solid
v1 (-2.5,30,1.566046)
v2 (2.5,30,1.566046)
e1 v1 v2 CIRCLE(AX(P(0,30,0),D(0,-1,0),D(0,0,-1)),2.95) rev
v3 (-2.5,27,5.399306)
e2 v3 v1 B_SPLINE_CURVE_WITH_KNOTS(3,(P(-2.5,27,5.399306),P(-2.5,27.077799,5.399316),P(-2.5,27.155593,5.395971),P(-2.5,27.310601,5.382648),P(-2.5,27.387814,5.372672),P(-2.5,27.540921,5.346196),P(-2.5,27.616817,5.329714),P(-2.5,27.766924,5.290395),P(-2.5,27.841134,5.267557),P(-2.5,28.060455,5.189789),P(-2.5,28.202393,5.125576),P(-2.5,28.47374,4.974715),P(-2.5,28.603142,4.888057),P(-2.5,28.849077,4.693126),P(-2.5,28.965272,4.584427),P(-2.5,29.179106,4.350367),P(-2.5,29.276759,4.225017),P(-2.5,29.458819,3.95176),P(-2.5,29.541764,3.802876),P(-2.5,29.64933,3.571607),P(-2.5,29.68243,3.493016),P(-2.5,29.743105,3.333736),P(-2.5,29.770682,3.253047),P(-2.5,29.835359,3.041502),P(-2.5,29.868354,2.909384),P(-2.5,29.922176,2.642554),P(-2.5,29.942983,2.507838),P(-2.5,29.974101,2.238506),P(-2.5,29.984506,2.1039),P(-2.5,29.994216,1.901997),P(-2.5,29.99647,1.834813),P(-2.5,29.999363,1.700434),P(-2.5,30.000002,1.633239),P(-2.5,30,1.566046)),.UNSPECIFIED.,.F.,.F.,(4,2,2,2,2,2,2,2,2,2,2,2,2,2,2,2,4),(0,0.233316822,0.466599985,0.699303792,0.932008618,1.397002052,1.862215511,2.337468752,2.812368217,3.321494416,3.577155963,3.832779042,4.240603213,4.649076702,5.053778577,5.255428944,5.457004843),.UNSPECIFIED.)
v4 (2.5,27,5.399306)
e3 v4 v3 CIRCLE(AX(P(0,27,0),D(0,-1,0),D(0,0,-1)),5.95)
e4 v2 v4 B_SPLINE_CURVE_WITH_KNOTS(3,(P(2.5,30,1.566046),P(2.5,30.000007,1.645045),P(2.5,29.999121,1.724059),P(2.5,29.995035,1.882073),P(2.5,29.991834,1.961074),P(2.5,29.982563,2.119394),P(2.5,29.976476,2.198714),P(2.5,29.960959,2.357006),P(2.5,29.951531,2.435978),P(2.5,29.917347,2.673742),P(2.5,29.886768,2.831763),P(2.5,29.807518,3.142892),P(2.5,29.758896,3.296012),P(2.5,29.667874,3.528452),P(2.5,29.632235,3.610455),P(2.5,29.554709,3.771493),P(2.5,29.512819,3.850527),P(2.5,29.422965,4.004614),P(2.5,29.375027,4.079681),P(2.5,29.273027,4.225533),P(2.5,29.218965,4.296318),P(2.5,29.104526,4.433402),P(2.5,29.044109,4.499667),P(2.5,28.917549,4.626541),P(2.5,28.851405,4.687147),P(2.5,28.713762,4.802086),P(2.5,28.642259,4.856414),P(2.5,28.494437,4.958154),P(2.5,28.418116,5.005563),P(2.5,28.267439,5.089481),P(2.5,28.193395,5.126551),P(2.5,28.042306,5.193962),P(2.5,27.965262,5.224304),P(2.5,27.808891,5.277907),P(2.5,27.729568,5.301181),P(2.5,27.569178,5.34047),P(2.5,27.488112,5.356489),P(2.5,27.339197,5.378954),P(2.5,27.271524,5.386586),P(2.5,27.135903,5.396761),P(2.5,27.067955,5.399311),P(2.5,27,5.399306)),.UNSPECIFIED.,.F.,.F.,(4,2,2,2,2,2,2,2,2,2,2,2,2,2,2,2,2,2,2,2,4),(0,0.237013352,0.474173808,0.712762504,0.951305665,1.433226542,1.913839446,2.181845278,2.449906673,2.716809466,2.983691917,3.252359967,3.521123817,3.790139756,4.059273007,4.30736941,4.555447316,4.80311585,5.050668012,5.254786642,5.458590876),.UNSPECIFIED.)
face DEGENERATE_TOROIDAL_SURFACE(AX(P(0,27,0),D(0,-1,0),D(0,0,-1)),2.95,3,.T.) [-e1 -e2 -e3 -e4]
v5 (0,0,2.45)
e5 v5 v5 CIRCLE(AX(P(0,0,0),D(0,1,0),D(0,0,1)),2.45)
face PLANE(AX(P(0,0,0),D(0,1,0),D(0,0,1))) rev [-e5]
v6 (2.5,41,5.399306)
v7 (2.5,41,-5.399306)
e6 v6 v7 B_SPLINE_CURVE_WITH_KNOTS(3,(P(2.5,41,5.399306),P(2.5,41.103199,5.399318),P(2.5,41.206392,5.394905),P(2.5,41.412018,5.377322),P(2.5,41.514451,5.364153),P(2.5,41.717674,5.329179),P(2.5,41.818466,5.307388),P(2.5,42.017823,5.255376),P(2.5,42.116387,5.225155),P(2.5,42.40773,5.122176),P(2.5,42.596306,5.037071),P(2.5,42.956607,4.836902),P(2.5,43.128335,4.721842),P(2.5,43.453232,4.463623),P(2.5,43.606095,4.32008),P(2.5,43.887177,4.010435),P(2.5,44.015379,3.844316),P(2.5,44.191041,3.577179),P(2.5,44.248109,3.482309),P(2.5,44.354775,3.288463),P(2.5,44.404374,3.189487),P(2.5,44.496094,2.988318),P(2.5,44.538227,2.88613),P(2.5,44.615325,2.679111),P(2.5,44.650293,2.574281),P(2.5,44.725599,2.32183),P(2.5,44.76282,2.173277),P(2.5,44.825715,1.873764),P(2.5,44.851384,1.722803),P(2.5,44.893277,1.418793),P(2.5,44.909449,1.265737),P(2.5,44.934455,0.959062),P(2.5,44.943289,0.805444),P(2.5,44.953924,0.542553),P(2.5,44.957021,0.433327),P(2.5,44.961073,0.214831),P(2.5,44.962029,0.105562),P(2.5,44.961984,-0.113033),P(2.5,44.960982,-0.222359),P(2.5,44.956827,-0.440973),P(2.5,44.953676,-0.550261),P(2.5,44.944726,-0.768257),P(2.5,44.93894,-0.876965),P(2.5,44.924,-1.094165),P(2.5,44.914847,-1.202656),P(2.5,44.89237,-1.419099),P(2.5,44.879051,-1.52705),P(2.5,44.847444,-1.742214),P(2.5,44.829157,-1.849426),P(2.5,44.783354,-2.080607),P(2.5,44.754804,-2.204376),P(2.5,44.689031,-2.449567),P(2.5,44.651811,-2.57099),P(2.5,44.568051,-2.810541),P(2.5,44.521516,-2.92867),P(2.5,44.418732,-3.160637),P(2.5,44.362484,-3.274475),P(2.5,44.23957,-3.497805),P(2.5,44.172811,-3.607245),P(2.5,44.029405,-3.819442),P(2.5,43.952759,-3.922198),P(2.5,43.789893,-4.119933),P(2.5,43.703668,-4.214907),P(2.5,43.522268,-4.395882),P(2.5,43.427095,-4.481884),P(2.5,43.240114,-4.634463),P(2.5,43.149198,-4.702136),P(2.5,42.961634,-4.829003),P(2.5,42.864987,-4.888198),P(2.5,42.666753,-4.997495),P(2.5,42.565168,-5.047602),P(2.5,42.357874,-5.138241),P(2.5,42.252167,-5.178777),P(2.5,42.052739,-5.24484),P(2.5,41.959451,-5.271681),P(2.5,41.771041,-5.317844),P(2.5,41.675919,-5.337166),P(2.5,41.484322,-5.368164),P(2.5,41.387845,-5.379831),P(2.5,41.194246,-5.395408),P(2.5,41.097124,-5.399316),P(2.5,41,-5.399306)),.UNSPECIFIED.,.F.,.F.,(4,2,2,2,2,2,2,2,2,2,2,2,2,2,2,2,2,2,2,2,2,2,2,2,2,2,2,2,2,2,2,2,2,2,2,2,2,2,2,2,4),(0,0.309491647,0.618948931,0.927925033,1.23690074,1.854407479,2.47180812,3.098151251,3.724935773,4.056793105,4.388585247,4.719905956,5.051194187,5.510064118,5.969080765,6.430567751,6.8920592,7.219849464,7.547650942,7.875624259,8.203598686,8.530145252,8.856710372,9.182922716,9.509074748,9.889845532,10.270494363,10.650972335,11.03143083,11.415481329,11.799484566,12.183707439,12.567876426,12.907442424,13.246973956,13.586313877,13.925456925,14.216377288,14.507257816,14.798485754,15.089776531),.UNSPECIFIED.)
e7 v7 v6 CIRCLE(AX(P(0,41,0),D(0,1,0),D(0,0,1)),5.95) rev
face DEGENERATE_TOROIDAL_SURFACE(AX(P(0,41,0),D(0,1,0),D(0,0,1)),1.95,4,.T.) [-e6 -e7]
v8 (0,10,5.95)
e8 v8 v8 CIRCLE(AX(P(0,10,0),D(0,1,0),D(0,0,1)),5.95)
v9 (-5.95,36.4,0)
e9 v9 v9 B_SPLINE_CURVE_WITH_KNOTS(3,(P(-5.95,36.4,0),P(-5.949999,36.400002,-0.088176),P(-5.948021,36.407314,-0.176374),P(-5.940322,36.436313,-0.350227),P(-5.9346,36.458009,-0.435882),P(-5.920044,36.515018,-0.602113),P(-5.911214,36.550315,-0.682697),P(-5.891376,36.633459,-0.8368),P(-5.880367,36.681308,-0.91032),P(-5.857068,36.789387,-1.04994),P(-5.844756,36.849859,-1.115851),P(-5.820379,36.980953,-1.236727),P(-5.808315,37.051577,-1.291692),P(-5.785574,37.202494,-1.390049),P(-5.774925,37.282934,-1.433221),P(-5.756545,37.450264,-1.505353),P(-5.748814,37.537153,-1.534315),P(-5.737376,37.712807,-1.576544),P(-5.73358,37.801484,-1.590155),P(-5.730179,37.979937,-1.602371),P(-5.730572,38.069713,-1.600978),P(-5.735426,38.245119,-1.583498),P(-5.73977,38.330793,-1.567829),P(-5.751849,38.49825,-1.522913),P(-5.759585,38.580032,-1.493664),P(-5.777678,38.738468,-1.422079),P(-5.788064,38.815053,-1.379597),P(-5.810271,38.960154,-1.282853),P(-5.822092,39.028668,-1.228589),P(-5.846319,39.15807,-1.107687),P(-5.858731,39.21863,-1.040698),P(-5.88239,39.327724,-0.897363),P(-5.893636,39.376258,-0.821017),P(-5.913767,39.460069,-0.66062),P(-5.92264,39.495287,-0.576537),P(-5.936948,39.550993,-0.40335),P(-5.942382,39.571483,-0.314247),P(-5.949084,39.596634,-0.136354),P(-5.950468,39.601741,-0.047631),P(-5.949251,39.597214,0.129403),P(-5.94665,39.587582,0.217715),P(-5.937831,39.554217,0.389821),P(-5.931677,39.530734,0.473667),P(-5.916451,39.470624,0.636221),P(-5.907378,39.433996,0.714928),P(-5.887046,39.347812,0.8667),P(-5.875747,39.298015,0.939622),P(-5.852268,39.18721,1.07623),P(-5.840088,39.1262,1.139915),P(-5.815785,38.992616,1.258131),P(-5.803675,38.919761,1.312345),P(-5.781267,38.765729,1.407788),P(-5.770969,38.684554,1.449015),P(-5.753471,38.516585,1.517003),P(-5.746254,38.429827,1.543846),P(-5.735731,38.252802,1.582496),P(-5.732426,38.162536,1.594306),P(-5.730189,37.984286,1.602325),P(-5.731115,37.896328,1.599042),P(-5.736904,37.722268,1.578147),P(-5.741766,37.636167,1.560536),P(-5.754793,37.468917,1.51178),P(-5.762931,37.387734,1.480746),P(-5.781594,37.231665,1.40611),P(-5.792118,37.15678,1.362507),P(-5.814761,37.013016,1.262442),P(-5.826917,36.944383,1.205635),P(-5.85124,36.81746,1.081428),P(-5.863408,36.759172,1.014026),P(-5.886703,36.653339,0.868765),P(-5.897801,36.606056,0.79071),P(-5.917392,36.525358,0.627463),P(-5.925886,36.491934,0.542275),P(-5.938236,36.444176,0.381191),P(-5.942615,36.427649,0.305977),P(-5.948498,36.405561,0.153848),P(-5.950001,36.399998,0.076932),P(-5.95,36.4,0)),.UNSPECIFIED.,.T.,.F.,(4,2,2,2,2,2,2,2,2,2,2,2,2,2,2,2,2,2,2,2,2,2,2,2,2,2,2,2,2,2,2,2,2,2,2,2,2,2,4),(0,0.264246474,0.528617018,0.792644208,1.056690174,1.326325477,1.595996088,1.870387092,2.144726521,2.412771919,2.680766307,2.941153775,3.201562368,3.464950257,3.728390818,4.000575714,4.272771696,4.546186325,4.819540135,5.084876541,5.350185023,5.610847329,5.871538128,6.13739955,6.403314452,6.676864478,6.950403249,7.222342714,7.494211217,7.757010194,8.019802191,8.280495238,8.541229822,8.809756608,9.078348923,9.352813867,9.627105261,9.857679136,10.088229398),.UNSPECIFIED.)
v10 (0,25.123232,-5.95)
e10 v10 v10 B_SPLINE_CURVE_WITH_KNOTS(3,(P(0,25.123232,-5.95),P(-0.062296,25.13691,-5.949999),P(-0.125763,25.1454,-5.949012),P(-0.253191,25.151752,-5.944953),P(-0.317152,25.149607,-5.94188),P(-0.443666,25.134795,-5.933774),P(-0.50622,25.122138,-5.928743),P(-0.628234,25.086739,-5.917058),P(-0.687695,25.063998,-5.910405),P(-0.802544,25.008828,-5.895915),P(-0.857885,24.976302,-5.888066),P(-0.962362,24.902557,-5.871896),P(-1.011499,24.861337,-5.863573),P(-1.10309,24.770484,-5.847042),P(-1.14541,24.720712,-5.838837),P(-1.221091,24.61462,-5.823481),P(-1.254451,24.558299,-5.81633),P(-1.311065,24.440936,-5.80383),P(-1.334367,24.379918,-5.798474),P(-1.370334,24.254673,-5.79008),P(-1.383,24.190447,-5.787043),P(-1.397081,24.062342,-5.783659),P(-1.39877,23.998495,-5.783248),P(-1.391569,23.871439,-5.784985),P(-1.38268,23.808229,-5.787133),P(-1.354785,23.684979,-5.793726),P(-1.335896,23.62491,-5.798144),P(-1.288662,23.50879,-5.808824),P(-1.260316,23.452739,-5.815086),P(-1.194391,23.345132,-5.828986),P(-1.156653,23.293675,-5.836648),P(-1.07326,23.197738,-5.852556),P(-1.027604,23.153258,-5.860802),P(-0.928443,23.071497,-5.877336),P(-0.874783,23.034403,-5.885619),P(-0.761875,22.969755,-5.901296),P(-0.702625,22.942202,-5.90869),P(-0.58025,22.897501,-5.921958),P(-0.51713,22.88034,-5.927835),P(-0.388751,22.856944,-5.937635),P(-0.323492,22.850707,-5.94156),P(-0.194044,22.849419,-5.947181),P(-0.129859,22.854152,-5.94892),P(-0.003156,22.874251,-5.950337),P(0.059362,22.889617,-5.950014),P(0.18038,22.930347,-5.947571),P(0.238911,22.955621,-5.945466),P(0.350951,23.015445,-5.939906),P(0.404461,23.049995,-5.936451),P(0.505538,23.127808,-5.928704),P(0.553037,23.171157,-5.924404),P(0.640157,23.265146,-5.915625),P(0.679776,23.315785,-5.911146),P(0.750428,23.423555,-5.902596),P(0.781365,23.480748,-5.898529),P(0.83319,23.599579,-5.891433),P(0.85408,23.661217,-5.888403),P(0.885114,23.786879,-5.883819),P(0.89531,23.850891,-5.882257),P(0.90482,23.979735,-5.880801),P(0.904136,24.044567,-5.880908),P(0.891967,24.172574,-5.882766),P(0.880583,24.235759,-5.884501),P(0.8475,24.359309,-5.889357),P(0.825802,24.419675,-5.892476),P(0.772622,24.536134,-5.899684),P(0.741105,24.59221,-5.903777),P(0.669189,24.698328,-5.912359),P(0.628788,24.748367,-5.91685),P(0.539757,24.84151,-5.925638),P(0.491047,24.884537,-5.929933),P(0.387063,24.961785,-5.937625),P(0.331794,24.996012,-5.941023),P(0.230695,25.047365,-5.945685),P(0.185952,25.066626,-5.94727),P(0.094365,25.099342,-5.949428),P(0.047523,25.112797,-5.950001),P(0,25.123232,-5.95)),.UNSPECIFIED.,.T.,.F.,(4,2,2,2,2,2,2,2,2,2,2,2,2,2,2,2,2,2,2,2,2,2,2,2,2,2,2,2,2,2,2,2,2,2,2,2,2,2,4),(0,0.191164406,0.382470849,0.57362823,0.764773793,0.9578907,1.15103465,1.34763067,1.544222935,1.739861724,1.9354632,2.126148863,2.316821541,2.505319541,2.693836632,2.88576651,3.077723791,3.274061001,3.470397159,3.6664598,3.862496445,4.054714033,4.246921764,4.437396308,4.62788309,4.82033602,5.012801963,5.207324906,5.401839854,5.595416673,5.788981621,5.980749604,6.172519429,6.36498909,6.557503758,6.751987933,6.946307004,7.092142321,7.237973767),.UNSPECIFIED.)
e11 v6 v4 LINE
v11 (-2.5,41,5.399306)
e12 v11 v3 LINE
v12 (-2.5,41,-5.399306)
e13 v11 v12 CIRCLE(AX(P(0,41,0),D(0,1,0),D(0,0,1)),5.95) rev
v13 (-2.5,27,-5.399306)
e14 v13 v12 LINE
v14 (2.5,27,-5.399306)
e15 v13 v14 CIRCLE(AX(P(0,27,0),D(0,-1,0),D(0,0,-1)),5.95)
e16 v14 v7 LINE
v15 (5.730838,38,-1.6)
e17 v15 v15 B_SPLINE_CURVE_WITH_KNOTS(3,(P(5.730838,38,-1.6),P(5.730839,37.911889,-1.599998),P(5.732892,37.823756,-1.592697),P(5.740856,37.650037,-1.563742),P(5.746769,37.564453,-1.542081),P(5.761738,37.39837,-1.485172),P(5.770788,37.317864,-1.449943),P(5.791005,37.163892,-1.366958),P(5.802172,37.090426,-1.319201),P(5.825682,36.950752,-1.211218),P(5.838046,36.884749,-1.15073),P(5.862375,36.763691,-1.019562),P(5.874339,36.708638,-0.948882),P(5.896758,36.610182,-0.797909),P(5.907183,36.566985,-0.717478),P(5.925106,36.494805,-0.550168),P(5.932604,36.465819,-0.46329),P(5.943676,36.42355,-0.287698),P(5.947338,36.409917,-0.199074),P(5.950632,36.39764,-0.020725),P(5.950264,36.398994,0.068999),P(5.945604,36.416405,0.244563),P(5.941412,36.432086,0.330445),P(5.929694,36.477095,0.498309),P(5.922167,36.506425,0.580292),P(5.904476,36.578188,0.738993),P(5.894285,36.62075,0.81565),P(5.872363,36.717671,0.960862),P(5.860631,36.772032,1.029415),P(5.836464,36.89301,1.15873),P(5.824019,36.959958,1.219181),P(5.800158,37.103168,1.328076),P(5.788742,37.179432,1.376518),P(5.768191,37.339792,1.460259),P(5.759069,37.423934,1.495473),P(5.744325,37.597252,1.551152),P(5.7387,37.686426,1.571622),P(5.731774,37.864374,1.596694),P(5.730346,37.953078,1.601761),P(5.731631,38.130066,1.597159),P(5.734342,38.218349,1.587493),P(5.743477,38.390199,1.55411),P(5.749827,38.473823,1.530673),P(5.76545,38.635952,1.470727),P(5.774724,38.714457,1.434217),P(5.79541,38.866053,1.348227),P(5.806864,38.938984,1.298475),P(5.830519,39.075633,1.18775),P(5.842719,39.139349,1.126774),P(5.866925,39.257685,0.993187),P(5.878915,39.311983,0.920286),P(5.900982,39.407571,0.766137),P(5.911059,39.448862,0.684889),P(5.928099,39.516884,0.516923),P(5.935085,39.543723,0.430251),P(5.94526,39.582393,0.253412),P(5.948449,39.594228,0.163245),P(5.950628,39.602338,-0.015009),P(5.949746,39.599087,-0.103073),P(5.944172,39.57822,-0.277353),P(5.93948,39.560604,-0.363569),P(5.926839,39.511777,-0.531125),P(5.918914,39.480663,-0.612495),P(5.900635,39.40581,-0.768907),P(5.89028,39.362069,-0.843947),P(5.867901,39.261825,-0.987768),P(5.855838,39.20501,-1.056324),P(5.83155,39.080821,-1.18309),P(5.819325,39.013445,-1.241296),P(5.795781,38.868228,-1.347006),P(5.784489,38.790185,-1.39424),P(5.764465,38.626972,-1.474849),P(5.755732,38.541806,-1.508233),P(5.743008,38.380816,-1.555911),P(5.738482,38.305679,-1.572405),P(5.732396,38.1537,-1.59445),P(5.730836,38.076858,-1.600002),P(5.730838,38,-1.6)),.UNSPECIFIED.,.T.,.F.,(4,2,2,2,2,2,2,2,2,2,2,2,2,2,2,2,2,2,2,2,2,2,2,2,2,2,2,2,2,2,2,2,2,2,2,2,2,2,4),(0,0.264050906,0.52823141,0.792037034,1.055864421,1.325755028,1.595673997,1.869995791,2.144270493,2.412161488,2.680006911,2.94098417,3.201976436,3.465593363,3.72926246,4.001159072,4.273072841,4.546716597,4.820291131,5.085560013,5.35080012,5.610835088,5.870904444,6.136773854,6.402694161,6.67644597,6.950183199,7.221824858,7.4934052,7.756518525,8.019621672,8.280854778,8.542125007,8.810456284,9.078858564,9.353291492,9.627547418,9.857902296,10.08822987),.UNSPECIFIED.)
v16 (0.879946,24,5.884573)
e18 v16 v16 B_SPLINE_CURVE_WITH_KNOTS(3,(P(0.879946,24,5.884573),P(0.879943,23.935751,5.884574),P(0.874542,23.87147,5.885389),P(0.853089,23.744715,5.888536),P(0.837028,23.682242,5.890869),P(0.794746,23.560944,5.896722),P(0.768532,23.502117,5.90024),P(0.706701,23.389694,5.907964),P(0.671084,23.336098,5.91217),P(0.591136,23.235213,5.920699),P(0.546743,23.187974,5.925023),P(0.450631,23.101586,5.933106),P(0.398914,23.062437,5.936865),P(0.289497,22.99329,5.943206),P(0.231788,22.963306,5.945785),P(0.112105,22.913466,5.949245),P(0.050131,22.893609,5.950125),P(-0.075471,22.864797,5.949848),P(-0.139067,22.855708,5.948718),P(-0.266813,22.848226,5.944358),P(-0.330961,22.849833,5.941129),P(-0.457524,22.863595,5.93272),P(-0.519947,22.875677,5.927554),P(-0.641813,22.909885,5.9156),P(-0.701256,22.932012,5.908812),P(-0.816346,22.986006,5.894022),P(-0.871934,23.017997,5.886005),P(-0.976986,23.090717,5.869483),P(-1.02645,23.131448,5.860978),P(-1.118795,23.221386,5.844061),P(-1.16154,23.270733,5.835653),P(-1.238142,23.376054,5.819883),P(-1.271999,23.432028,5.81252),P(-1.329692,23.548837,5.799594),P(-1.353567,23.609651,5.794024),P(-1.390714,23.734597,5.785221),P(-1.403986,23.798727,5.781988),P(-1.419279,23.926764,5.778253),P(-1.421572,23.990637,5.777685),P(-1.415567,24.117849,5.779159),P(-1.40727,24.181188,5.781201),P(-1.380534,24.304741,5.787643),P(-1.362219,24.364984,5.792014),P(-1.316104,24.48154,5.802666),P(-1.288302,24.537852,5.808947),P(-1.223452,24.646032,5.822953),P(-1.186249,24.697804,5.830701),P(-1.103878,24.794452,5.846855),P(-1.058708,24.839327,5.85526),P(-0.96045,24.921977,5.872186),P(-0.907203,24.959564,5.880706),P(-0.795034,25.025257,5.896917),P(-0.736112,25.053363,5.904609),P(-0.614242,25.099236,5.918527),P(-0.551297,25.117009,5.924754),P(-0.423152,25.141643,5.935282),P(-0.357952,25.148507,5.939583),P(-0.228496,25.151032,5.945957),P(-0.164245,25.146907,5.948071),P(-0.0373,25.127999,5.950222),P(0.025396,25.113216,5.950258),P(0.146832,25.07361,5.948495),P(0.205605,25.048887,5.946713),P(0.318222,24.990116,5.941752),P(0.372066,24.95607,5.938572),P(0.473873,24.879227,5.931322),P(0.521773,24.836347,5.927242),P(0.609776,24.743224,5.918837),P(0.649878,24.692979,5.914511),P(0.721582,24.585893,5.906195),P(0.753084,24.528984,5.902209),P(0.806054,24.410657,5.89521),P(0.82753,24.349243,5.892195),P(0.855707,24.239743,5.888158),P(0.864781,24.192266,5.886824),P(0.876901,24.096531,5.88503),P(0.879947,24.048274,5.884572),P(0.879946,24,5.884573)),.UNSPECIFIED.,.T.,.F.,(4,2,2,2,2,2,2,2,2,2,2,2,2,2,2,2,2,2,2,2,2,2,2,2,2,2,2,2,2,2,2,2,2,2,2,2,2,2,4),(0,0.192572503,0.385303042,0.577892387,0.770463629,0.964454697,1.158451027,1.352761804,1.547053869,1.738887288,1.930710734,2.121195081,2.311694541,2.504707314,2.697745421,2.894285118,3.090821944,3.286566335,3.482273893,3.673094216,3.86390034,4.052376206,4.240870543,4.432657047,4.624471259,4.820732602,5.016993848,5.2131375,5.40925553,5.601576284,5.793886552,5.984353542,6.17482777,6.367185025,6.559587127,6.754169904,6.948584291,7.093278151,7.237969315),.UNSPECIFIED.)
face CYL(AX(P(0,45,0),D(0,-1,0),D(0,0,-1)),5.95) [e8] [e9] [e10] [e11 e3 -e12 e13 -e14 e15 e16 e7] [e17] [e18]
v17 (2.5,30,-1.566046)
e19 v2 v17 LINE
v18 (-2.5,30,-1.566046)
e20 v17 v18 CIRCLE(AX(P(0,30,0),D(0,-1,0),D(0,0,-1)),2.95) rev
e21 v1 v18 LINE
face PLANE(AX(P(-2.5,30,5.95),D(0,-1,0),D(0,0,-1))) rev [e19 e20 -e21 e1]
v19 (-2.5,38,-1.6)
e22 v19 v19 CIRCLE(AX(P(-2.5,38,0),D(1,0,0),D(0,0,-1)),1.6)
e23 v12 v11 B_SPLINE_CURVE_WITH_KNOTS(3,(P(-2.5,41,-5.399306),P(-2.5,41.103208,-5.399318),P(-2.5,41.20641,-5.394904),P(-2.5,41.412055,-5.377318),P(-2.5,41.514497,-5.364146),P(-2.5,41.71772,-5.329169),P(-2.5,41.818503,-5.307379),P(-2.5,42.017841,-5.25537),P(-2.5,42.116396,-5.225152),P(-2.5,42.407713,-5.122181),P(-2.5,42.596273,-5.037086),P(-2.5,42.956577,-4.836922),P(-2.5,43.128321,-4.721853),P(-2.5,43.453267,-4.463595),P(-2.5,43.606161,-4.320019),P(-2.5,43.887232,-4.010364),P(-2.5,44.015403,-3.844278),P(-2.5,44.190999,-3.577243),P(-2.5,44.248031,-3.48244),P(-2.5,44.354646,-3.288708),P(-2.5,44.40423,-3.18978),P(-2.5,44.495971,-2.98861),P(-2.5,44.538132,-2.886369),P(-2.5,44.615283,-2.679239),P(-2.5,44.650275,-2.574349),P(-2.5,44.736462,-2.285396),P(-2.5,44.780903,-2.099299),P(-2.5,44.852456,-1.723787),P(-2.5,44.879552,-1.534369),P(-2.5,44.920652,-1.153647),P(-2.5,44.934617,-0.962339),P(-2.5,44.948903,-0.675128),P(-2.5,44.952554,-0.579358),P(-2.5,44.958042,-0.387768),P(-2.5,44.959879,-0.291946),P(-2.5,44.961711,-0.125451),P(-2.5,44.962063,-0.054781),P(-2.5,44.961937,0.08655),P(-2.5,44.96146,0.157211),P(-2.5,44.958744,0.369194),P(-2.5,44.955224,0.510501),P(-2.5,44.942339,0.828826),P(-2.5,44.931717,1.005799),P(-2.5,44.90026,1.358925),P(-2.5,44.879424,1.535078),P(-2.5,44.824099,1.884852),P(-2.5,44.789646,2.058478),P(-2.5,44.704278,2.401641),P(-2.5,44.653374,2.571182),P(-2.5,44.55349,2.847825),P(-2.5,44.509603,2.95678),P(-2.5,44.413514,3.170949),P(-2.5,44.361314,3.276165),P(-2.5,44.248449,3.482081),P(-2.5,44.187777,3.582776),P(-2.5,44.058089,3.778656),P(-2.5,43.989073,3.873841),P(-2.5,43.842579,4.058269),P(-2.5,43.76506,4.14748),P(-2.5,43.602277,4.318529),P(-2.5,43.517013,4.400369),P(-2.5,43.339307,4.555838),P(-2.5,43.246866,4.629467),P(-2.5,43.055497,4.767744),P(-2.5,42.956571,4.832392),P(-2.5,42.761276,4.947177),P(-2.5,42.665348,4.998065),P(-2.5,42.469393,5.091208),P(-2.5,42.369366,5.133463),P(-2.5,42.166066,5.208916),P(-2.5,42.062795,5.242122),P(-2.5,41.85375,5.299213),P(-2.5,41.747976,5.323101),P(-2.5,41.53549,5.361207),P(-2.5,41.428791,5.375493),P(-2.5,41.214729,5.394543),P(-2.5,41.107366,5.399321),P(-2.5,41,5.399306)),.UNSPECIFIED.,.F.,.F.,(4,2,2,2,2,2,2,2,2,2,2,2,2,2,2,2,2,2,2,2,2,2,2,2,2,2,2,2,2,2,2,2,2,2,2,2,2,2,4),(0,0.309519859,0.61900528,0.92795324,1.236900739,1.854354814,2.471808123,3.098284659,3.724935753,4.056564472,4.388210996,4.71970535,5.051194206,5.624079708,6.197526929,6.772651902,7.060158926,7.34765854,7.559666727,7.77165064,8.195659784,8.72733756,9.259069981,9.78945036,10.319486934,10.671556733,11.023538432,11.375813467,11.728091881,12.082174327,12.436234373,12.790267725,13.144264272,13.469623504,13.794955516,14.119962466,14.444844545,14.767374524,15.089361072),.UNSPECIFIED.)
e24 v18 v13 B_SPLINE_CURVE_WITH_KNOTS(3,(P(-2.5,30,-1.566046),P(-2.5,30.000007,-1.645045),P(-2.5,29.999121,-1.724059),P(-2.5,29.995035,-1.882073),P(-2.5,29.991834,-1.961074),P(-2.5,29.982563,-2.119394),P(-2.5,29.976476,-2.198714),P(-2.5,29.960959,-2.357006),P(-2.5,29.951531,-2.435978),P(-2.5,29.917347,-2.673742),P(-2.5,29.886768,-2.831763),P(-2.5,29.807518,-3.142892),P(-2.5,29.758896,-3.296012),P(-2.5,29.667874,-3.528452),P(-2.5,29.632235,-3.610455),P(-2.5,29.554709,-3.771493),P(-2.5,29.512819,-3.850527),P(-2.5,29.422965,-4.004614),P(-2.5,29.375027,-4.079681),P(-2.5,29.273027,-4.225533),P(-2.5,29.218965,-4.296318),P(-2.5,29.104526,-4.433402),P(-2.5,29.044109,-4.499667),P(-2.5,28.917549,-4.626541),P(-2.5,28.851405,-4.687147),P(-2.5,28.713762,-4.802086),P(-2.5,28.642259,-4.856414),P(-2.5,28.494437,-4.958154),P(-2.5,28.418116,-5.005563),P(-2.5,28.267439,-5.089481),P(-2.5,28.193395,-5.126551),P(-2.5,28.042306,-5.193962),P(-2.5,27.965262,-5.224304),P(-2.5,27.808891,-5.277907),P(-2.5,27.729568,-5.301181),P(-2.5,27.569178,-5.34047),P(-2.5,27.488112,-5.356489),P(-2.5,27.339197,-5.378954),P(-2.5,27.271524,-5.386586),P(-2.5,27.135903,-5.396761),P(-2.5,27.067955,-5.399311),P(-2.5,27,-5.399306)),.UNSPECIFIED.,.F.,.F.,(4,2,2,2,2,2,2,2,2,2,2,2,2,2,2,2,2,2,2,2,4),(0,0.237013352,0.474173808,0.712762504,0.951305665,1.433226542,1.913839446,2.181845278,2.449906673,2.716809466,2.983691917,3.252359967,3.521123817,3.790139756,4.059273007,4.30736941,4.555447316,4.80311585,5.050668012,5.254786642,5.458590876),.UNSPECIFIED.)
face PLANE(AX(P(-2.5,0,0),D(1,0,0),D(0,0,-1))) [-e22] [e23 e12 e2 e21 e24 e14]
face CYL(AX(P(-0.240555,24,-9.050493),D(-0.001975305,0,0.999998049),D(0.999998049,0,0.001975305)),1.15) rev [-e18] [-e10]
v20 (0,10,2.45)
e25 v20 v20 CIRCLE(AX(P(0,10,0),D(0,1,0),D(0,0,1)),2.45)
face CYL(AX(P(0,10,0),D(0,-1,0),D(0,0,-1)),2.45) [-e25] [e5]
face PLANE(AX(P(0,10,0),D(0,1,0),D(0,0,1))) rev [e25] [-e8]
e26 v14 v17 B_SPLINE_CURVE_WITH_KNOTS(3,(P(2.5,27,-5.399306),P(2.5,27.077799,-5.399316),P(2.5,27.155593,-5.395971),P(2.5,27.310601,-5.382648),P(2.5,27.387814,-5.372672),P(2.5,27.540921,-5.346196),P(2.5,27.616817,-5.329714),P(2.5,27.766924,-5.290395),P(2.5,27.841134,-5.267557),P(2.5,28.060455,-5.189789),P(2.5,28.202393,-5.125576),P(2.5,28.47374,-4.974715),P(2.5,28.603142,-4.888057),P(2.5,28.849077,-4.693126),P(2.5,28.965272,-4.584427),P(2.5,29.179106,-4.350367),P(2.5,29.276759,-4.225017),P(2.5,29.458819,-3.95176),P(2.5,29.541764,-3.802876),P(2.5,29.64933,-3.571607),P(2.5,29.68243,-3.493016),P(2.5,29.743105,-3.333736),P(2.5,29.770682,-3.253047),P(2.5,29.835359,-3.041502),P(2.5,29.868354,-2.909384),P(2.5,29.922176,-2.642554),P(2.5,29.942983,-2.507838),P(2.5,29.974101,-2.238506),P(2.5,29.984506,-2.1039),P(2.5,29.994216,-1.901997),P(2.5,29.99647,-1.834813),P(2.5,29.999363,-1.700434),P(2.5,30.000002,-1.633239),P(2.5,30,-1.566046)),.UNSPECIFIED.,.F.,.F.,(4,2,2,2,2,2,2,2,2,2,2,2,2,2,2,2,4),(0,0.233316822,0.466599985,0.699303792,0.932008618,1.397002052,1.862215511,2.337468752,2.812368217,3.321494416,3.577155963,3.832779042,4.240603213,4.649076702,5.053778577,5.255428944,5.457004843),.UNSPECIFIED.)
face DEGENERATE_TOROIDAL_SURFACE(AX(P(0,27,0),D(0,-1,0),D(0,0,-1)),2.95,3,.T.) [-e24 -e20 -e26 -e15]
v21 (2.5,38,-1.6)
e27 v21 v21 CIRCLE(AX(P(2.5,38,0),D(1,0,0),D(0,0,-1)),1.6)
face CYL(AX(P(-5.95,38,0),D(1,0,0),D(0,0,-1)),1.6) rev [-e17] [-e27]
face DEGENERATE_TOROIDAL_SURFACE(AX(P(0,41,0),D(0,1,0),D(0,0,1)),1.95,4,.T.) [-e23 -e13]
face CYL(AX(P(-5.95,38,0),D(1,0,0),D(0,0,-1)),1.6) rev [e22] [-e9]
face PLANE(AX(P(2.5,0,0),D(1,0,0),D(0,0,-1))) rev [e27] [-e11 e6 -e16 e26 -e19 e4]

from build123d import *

# Parameters (mm, degrees)
SKETCH1_R               = 2.45
BOSS_EXTRUDE1_DEPTH     = 10
SKETCH2_R               = 5.95
BOSS_EXTRUDE2_DEPTH     = 35
SKETCH4_W               = 11.9
SKETCH4_H               = 15
CUT_EXTRUDE1_DEPTH      = 2.5
CUT_EXTRUDE2_DEPTH      = 46.779962866
CUT_EXTRUDE2_DEPTH_BACK = 46.779962866
SKETCH5_R               = 1.6
FILLET1_R               = 4
FILLET2_R               = 3
SKETCH6_R               = 1.15
CUT_EXTRUDE3_DEPTH      = 15


with BuildPart() as part:
    # Sketch1 → Boss-Extrude1 (new body)
    with BuildSketch(Plane(origin=(0, 0, 0), x_dir=(1, 0, 0), z_dir=(0, 1, 0))):
        with Locations(Location((0, 0, 0), (0, 0, 270))):
            Circle(SKETCH1_R)
    extrude(amount=BOSS_EXTRUDE1_DEPTH)

    # Sketch2 → Boss-Extrude2 (add)
    with BuildSketch(Plane(origin=(0, 10, 0), x_dir=(1, 0, 0), z_dir=(0, 1, 0))):
        with Locations(Location((0, 0, 0), (0, 0, 270))):
            Circle(SKETCH2_R)
    extrude(amount=BOSS_EXTRUDE2_DEPTH)

    # Sketch4 → Cut-Extrude1 (cut, symmetric)
    with BuildSketch(Plane(origin=(0, 0, 0), x_dir=(0, 0, -1), z_dir=(1, 0, 0))):
        with Locations((0, 37.5)):
            Rectangle(SKETCH4_W, SKETCH4_H)
    extrude(amount=CUT_EXTRUDE1_DEPTH, both=True, mode=Mode.SUBTRACT)

    # Sketch5 → Cut-Extrude2 (cut, two sides: drawn at the far end of the back side and taken through both)
    with BuildSketch(Plane(origin=(0, 0, 0), x_dir=(0, 0, -1), z_dir=(1, 0, 0)).offset(-CUT_EXTRUDE2_DEPTH_BACK)):
        with Locations((0, 38)):
            Circle(SKETCH5_R)
    extrude(amount=CUT_EXTRUDE2_DEPTH + CUT_EXTRUDE2_DEPTH_BACK, mode=Mode.SUBTRACT)

    # Fillet1
    # the kernel refuses this fillet: 4 mm, written as the material it takes off along each edge
    with BuildSketch(Plane(origin=(0, 45, 0), x_dir=(-0.9484971142590468, 0, 0.31678577026479715), z_dir=(-0.31678577026479715, 0, -0.9484971142590468))) as fillet1_piece_1:
        with BuildLine():
            CenterArc((5.95 - FILLET1_R, -FILLET1_R), FILLET1_R, 0, 90)
            Line((5.95 - FILLET1_R, 0), (5.95, 0))
            Line((5.95, 0), (5.95, -FILLET1_R))
        make_face()
    revolve(axis=Axis((0, 45, 0), (0, 1, 0)), revolution_arc=323.062694348, mode=Mode.SUBTRACT)
    with BuildSketch(Plane(origin=(0, 45, 0), x_dir=(0.948497114259044, 0, -0.31678577026480526), z_dir=(0.31678577026480526, 0, 0.948497114259044))) as fillet1_piece_2:
        with BuildLine():
            CenterArc((5.95 - FILLET1_R, -FILLET1_R), FILLET1_R, 0, 90)
            Line((5.95 - FILLET1_R, 0), (5.95, 0))
            Line((5.95, 0), (5.95, -FILLET1_R))
        make_face()
    revolve(axis=Axis((0, 45, 0), (0, 1, 0)), revolution_arc=323.062694348, mode=Mode.SUBTRACT)

    # Fillet2
    fillet2_edges = [part.edges().sort_by_distance(p)[0] for p in [
        (0, 30, -5.95),
        (1.279967228, 30, 5.810695646),
    ]]
    fillet(fillet2_edges, radius=FILLET2_R)

    # Sketch6 → Cut-Extrude3 (cut)
    with BuildSketch(Plane(origin=(-0.011753066, 0, 5.949988392), x_dir=(0.9999980490826653, 0, 0.0019753052582657496), z_dir=(-0.0019753052582657496, 0, 0.9999980490826653))):
        with Locations((-0.258432266, 24)):
            Circle(SKETCH6_R)
    extrude(amount=-CUT_EXTRUDE3_DEPTH, mode=Mode.SUBTRACT)


solid = part.part
